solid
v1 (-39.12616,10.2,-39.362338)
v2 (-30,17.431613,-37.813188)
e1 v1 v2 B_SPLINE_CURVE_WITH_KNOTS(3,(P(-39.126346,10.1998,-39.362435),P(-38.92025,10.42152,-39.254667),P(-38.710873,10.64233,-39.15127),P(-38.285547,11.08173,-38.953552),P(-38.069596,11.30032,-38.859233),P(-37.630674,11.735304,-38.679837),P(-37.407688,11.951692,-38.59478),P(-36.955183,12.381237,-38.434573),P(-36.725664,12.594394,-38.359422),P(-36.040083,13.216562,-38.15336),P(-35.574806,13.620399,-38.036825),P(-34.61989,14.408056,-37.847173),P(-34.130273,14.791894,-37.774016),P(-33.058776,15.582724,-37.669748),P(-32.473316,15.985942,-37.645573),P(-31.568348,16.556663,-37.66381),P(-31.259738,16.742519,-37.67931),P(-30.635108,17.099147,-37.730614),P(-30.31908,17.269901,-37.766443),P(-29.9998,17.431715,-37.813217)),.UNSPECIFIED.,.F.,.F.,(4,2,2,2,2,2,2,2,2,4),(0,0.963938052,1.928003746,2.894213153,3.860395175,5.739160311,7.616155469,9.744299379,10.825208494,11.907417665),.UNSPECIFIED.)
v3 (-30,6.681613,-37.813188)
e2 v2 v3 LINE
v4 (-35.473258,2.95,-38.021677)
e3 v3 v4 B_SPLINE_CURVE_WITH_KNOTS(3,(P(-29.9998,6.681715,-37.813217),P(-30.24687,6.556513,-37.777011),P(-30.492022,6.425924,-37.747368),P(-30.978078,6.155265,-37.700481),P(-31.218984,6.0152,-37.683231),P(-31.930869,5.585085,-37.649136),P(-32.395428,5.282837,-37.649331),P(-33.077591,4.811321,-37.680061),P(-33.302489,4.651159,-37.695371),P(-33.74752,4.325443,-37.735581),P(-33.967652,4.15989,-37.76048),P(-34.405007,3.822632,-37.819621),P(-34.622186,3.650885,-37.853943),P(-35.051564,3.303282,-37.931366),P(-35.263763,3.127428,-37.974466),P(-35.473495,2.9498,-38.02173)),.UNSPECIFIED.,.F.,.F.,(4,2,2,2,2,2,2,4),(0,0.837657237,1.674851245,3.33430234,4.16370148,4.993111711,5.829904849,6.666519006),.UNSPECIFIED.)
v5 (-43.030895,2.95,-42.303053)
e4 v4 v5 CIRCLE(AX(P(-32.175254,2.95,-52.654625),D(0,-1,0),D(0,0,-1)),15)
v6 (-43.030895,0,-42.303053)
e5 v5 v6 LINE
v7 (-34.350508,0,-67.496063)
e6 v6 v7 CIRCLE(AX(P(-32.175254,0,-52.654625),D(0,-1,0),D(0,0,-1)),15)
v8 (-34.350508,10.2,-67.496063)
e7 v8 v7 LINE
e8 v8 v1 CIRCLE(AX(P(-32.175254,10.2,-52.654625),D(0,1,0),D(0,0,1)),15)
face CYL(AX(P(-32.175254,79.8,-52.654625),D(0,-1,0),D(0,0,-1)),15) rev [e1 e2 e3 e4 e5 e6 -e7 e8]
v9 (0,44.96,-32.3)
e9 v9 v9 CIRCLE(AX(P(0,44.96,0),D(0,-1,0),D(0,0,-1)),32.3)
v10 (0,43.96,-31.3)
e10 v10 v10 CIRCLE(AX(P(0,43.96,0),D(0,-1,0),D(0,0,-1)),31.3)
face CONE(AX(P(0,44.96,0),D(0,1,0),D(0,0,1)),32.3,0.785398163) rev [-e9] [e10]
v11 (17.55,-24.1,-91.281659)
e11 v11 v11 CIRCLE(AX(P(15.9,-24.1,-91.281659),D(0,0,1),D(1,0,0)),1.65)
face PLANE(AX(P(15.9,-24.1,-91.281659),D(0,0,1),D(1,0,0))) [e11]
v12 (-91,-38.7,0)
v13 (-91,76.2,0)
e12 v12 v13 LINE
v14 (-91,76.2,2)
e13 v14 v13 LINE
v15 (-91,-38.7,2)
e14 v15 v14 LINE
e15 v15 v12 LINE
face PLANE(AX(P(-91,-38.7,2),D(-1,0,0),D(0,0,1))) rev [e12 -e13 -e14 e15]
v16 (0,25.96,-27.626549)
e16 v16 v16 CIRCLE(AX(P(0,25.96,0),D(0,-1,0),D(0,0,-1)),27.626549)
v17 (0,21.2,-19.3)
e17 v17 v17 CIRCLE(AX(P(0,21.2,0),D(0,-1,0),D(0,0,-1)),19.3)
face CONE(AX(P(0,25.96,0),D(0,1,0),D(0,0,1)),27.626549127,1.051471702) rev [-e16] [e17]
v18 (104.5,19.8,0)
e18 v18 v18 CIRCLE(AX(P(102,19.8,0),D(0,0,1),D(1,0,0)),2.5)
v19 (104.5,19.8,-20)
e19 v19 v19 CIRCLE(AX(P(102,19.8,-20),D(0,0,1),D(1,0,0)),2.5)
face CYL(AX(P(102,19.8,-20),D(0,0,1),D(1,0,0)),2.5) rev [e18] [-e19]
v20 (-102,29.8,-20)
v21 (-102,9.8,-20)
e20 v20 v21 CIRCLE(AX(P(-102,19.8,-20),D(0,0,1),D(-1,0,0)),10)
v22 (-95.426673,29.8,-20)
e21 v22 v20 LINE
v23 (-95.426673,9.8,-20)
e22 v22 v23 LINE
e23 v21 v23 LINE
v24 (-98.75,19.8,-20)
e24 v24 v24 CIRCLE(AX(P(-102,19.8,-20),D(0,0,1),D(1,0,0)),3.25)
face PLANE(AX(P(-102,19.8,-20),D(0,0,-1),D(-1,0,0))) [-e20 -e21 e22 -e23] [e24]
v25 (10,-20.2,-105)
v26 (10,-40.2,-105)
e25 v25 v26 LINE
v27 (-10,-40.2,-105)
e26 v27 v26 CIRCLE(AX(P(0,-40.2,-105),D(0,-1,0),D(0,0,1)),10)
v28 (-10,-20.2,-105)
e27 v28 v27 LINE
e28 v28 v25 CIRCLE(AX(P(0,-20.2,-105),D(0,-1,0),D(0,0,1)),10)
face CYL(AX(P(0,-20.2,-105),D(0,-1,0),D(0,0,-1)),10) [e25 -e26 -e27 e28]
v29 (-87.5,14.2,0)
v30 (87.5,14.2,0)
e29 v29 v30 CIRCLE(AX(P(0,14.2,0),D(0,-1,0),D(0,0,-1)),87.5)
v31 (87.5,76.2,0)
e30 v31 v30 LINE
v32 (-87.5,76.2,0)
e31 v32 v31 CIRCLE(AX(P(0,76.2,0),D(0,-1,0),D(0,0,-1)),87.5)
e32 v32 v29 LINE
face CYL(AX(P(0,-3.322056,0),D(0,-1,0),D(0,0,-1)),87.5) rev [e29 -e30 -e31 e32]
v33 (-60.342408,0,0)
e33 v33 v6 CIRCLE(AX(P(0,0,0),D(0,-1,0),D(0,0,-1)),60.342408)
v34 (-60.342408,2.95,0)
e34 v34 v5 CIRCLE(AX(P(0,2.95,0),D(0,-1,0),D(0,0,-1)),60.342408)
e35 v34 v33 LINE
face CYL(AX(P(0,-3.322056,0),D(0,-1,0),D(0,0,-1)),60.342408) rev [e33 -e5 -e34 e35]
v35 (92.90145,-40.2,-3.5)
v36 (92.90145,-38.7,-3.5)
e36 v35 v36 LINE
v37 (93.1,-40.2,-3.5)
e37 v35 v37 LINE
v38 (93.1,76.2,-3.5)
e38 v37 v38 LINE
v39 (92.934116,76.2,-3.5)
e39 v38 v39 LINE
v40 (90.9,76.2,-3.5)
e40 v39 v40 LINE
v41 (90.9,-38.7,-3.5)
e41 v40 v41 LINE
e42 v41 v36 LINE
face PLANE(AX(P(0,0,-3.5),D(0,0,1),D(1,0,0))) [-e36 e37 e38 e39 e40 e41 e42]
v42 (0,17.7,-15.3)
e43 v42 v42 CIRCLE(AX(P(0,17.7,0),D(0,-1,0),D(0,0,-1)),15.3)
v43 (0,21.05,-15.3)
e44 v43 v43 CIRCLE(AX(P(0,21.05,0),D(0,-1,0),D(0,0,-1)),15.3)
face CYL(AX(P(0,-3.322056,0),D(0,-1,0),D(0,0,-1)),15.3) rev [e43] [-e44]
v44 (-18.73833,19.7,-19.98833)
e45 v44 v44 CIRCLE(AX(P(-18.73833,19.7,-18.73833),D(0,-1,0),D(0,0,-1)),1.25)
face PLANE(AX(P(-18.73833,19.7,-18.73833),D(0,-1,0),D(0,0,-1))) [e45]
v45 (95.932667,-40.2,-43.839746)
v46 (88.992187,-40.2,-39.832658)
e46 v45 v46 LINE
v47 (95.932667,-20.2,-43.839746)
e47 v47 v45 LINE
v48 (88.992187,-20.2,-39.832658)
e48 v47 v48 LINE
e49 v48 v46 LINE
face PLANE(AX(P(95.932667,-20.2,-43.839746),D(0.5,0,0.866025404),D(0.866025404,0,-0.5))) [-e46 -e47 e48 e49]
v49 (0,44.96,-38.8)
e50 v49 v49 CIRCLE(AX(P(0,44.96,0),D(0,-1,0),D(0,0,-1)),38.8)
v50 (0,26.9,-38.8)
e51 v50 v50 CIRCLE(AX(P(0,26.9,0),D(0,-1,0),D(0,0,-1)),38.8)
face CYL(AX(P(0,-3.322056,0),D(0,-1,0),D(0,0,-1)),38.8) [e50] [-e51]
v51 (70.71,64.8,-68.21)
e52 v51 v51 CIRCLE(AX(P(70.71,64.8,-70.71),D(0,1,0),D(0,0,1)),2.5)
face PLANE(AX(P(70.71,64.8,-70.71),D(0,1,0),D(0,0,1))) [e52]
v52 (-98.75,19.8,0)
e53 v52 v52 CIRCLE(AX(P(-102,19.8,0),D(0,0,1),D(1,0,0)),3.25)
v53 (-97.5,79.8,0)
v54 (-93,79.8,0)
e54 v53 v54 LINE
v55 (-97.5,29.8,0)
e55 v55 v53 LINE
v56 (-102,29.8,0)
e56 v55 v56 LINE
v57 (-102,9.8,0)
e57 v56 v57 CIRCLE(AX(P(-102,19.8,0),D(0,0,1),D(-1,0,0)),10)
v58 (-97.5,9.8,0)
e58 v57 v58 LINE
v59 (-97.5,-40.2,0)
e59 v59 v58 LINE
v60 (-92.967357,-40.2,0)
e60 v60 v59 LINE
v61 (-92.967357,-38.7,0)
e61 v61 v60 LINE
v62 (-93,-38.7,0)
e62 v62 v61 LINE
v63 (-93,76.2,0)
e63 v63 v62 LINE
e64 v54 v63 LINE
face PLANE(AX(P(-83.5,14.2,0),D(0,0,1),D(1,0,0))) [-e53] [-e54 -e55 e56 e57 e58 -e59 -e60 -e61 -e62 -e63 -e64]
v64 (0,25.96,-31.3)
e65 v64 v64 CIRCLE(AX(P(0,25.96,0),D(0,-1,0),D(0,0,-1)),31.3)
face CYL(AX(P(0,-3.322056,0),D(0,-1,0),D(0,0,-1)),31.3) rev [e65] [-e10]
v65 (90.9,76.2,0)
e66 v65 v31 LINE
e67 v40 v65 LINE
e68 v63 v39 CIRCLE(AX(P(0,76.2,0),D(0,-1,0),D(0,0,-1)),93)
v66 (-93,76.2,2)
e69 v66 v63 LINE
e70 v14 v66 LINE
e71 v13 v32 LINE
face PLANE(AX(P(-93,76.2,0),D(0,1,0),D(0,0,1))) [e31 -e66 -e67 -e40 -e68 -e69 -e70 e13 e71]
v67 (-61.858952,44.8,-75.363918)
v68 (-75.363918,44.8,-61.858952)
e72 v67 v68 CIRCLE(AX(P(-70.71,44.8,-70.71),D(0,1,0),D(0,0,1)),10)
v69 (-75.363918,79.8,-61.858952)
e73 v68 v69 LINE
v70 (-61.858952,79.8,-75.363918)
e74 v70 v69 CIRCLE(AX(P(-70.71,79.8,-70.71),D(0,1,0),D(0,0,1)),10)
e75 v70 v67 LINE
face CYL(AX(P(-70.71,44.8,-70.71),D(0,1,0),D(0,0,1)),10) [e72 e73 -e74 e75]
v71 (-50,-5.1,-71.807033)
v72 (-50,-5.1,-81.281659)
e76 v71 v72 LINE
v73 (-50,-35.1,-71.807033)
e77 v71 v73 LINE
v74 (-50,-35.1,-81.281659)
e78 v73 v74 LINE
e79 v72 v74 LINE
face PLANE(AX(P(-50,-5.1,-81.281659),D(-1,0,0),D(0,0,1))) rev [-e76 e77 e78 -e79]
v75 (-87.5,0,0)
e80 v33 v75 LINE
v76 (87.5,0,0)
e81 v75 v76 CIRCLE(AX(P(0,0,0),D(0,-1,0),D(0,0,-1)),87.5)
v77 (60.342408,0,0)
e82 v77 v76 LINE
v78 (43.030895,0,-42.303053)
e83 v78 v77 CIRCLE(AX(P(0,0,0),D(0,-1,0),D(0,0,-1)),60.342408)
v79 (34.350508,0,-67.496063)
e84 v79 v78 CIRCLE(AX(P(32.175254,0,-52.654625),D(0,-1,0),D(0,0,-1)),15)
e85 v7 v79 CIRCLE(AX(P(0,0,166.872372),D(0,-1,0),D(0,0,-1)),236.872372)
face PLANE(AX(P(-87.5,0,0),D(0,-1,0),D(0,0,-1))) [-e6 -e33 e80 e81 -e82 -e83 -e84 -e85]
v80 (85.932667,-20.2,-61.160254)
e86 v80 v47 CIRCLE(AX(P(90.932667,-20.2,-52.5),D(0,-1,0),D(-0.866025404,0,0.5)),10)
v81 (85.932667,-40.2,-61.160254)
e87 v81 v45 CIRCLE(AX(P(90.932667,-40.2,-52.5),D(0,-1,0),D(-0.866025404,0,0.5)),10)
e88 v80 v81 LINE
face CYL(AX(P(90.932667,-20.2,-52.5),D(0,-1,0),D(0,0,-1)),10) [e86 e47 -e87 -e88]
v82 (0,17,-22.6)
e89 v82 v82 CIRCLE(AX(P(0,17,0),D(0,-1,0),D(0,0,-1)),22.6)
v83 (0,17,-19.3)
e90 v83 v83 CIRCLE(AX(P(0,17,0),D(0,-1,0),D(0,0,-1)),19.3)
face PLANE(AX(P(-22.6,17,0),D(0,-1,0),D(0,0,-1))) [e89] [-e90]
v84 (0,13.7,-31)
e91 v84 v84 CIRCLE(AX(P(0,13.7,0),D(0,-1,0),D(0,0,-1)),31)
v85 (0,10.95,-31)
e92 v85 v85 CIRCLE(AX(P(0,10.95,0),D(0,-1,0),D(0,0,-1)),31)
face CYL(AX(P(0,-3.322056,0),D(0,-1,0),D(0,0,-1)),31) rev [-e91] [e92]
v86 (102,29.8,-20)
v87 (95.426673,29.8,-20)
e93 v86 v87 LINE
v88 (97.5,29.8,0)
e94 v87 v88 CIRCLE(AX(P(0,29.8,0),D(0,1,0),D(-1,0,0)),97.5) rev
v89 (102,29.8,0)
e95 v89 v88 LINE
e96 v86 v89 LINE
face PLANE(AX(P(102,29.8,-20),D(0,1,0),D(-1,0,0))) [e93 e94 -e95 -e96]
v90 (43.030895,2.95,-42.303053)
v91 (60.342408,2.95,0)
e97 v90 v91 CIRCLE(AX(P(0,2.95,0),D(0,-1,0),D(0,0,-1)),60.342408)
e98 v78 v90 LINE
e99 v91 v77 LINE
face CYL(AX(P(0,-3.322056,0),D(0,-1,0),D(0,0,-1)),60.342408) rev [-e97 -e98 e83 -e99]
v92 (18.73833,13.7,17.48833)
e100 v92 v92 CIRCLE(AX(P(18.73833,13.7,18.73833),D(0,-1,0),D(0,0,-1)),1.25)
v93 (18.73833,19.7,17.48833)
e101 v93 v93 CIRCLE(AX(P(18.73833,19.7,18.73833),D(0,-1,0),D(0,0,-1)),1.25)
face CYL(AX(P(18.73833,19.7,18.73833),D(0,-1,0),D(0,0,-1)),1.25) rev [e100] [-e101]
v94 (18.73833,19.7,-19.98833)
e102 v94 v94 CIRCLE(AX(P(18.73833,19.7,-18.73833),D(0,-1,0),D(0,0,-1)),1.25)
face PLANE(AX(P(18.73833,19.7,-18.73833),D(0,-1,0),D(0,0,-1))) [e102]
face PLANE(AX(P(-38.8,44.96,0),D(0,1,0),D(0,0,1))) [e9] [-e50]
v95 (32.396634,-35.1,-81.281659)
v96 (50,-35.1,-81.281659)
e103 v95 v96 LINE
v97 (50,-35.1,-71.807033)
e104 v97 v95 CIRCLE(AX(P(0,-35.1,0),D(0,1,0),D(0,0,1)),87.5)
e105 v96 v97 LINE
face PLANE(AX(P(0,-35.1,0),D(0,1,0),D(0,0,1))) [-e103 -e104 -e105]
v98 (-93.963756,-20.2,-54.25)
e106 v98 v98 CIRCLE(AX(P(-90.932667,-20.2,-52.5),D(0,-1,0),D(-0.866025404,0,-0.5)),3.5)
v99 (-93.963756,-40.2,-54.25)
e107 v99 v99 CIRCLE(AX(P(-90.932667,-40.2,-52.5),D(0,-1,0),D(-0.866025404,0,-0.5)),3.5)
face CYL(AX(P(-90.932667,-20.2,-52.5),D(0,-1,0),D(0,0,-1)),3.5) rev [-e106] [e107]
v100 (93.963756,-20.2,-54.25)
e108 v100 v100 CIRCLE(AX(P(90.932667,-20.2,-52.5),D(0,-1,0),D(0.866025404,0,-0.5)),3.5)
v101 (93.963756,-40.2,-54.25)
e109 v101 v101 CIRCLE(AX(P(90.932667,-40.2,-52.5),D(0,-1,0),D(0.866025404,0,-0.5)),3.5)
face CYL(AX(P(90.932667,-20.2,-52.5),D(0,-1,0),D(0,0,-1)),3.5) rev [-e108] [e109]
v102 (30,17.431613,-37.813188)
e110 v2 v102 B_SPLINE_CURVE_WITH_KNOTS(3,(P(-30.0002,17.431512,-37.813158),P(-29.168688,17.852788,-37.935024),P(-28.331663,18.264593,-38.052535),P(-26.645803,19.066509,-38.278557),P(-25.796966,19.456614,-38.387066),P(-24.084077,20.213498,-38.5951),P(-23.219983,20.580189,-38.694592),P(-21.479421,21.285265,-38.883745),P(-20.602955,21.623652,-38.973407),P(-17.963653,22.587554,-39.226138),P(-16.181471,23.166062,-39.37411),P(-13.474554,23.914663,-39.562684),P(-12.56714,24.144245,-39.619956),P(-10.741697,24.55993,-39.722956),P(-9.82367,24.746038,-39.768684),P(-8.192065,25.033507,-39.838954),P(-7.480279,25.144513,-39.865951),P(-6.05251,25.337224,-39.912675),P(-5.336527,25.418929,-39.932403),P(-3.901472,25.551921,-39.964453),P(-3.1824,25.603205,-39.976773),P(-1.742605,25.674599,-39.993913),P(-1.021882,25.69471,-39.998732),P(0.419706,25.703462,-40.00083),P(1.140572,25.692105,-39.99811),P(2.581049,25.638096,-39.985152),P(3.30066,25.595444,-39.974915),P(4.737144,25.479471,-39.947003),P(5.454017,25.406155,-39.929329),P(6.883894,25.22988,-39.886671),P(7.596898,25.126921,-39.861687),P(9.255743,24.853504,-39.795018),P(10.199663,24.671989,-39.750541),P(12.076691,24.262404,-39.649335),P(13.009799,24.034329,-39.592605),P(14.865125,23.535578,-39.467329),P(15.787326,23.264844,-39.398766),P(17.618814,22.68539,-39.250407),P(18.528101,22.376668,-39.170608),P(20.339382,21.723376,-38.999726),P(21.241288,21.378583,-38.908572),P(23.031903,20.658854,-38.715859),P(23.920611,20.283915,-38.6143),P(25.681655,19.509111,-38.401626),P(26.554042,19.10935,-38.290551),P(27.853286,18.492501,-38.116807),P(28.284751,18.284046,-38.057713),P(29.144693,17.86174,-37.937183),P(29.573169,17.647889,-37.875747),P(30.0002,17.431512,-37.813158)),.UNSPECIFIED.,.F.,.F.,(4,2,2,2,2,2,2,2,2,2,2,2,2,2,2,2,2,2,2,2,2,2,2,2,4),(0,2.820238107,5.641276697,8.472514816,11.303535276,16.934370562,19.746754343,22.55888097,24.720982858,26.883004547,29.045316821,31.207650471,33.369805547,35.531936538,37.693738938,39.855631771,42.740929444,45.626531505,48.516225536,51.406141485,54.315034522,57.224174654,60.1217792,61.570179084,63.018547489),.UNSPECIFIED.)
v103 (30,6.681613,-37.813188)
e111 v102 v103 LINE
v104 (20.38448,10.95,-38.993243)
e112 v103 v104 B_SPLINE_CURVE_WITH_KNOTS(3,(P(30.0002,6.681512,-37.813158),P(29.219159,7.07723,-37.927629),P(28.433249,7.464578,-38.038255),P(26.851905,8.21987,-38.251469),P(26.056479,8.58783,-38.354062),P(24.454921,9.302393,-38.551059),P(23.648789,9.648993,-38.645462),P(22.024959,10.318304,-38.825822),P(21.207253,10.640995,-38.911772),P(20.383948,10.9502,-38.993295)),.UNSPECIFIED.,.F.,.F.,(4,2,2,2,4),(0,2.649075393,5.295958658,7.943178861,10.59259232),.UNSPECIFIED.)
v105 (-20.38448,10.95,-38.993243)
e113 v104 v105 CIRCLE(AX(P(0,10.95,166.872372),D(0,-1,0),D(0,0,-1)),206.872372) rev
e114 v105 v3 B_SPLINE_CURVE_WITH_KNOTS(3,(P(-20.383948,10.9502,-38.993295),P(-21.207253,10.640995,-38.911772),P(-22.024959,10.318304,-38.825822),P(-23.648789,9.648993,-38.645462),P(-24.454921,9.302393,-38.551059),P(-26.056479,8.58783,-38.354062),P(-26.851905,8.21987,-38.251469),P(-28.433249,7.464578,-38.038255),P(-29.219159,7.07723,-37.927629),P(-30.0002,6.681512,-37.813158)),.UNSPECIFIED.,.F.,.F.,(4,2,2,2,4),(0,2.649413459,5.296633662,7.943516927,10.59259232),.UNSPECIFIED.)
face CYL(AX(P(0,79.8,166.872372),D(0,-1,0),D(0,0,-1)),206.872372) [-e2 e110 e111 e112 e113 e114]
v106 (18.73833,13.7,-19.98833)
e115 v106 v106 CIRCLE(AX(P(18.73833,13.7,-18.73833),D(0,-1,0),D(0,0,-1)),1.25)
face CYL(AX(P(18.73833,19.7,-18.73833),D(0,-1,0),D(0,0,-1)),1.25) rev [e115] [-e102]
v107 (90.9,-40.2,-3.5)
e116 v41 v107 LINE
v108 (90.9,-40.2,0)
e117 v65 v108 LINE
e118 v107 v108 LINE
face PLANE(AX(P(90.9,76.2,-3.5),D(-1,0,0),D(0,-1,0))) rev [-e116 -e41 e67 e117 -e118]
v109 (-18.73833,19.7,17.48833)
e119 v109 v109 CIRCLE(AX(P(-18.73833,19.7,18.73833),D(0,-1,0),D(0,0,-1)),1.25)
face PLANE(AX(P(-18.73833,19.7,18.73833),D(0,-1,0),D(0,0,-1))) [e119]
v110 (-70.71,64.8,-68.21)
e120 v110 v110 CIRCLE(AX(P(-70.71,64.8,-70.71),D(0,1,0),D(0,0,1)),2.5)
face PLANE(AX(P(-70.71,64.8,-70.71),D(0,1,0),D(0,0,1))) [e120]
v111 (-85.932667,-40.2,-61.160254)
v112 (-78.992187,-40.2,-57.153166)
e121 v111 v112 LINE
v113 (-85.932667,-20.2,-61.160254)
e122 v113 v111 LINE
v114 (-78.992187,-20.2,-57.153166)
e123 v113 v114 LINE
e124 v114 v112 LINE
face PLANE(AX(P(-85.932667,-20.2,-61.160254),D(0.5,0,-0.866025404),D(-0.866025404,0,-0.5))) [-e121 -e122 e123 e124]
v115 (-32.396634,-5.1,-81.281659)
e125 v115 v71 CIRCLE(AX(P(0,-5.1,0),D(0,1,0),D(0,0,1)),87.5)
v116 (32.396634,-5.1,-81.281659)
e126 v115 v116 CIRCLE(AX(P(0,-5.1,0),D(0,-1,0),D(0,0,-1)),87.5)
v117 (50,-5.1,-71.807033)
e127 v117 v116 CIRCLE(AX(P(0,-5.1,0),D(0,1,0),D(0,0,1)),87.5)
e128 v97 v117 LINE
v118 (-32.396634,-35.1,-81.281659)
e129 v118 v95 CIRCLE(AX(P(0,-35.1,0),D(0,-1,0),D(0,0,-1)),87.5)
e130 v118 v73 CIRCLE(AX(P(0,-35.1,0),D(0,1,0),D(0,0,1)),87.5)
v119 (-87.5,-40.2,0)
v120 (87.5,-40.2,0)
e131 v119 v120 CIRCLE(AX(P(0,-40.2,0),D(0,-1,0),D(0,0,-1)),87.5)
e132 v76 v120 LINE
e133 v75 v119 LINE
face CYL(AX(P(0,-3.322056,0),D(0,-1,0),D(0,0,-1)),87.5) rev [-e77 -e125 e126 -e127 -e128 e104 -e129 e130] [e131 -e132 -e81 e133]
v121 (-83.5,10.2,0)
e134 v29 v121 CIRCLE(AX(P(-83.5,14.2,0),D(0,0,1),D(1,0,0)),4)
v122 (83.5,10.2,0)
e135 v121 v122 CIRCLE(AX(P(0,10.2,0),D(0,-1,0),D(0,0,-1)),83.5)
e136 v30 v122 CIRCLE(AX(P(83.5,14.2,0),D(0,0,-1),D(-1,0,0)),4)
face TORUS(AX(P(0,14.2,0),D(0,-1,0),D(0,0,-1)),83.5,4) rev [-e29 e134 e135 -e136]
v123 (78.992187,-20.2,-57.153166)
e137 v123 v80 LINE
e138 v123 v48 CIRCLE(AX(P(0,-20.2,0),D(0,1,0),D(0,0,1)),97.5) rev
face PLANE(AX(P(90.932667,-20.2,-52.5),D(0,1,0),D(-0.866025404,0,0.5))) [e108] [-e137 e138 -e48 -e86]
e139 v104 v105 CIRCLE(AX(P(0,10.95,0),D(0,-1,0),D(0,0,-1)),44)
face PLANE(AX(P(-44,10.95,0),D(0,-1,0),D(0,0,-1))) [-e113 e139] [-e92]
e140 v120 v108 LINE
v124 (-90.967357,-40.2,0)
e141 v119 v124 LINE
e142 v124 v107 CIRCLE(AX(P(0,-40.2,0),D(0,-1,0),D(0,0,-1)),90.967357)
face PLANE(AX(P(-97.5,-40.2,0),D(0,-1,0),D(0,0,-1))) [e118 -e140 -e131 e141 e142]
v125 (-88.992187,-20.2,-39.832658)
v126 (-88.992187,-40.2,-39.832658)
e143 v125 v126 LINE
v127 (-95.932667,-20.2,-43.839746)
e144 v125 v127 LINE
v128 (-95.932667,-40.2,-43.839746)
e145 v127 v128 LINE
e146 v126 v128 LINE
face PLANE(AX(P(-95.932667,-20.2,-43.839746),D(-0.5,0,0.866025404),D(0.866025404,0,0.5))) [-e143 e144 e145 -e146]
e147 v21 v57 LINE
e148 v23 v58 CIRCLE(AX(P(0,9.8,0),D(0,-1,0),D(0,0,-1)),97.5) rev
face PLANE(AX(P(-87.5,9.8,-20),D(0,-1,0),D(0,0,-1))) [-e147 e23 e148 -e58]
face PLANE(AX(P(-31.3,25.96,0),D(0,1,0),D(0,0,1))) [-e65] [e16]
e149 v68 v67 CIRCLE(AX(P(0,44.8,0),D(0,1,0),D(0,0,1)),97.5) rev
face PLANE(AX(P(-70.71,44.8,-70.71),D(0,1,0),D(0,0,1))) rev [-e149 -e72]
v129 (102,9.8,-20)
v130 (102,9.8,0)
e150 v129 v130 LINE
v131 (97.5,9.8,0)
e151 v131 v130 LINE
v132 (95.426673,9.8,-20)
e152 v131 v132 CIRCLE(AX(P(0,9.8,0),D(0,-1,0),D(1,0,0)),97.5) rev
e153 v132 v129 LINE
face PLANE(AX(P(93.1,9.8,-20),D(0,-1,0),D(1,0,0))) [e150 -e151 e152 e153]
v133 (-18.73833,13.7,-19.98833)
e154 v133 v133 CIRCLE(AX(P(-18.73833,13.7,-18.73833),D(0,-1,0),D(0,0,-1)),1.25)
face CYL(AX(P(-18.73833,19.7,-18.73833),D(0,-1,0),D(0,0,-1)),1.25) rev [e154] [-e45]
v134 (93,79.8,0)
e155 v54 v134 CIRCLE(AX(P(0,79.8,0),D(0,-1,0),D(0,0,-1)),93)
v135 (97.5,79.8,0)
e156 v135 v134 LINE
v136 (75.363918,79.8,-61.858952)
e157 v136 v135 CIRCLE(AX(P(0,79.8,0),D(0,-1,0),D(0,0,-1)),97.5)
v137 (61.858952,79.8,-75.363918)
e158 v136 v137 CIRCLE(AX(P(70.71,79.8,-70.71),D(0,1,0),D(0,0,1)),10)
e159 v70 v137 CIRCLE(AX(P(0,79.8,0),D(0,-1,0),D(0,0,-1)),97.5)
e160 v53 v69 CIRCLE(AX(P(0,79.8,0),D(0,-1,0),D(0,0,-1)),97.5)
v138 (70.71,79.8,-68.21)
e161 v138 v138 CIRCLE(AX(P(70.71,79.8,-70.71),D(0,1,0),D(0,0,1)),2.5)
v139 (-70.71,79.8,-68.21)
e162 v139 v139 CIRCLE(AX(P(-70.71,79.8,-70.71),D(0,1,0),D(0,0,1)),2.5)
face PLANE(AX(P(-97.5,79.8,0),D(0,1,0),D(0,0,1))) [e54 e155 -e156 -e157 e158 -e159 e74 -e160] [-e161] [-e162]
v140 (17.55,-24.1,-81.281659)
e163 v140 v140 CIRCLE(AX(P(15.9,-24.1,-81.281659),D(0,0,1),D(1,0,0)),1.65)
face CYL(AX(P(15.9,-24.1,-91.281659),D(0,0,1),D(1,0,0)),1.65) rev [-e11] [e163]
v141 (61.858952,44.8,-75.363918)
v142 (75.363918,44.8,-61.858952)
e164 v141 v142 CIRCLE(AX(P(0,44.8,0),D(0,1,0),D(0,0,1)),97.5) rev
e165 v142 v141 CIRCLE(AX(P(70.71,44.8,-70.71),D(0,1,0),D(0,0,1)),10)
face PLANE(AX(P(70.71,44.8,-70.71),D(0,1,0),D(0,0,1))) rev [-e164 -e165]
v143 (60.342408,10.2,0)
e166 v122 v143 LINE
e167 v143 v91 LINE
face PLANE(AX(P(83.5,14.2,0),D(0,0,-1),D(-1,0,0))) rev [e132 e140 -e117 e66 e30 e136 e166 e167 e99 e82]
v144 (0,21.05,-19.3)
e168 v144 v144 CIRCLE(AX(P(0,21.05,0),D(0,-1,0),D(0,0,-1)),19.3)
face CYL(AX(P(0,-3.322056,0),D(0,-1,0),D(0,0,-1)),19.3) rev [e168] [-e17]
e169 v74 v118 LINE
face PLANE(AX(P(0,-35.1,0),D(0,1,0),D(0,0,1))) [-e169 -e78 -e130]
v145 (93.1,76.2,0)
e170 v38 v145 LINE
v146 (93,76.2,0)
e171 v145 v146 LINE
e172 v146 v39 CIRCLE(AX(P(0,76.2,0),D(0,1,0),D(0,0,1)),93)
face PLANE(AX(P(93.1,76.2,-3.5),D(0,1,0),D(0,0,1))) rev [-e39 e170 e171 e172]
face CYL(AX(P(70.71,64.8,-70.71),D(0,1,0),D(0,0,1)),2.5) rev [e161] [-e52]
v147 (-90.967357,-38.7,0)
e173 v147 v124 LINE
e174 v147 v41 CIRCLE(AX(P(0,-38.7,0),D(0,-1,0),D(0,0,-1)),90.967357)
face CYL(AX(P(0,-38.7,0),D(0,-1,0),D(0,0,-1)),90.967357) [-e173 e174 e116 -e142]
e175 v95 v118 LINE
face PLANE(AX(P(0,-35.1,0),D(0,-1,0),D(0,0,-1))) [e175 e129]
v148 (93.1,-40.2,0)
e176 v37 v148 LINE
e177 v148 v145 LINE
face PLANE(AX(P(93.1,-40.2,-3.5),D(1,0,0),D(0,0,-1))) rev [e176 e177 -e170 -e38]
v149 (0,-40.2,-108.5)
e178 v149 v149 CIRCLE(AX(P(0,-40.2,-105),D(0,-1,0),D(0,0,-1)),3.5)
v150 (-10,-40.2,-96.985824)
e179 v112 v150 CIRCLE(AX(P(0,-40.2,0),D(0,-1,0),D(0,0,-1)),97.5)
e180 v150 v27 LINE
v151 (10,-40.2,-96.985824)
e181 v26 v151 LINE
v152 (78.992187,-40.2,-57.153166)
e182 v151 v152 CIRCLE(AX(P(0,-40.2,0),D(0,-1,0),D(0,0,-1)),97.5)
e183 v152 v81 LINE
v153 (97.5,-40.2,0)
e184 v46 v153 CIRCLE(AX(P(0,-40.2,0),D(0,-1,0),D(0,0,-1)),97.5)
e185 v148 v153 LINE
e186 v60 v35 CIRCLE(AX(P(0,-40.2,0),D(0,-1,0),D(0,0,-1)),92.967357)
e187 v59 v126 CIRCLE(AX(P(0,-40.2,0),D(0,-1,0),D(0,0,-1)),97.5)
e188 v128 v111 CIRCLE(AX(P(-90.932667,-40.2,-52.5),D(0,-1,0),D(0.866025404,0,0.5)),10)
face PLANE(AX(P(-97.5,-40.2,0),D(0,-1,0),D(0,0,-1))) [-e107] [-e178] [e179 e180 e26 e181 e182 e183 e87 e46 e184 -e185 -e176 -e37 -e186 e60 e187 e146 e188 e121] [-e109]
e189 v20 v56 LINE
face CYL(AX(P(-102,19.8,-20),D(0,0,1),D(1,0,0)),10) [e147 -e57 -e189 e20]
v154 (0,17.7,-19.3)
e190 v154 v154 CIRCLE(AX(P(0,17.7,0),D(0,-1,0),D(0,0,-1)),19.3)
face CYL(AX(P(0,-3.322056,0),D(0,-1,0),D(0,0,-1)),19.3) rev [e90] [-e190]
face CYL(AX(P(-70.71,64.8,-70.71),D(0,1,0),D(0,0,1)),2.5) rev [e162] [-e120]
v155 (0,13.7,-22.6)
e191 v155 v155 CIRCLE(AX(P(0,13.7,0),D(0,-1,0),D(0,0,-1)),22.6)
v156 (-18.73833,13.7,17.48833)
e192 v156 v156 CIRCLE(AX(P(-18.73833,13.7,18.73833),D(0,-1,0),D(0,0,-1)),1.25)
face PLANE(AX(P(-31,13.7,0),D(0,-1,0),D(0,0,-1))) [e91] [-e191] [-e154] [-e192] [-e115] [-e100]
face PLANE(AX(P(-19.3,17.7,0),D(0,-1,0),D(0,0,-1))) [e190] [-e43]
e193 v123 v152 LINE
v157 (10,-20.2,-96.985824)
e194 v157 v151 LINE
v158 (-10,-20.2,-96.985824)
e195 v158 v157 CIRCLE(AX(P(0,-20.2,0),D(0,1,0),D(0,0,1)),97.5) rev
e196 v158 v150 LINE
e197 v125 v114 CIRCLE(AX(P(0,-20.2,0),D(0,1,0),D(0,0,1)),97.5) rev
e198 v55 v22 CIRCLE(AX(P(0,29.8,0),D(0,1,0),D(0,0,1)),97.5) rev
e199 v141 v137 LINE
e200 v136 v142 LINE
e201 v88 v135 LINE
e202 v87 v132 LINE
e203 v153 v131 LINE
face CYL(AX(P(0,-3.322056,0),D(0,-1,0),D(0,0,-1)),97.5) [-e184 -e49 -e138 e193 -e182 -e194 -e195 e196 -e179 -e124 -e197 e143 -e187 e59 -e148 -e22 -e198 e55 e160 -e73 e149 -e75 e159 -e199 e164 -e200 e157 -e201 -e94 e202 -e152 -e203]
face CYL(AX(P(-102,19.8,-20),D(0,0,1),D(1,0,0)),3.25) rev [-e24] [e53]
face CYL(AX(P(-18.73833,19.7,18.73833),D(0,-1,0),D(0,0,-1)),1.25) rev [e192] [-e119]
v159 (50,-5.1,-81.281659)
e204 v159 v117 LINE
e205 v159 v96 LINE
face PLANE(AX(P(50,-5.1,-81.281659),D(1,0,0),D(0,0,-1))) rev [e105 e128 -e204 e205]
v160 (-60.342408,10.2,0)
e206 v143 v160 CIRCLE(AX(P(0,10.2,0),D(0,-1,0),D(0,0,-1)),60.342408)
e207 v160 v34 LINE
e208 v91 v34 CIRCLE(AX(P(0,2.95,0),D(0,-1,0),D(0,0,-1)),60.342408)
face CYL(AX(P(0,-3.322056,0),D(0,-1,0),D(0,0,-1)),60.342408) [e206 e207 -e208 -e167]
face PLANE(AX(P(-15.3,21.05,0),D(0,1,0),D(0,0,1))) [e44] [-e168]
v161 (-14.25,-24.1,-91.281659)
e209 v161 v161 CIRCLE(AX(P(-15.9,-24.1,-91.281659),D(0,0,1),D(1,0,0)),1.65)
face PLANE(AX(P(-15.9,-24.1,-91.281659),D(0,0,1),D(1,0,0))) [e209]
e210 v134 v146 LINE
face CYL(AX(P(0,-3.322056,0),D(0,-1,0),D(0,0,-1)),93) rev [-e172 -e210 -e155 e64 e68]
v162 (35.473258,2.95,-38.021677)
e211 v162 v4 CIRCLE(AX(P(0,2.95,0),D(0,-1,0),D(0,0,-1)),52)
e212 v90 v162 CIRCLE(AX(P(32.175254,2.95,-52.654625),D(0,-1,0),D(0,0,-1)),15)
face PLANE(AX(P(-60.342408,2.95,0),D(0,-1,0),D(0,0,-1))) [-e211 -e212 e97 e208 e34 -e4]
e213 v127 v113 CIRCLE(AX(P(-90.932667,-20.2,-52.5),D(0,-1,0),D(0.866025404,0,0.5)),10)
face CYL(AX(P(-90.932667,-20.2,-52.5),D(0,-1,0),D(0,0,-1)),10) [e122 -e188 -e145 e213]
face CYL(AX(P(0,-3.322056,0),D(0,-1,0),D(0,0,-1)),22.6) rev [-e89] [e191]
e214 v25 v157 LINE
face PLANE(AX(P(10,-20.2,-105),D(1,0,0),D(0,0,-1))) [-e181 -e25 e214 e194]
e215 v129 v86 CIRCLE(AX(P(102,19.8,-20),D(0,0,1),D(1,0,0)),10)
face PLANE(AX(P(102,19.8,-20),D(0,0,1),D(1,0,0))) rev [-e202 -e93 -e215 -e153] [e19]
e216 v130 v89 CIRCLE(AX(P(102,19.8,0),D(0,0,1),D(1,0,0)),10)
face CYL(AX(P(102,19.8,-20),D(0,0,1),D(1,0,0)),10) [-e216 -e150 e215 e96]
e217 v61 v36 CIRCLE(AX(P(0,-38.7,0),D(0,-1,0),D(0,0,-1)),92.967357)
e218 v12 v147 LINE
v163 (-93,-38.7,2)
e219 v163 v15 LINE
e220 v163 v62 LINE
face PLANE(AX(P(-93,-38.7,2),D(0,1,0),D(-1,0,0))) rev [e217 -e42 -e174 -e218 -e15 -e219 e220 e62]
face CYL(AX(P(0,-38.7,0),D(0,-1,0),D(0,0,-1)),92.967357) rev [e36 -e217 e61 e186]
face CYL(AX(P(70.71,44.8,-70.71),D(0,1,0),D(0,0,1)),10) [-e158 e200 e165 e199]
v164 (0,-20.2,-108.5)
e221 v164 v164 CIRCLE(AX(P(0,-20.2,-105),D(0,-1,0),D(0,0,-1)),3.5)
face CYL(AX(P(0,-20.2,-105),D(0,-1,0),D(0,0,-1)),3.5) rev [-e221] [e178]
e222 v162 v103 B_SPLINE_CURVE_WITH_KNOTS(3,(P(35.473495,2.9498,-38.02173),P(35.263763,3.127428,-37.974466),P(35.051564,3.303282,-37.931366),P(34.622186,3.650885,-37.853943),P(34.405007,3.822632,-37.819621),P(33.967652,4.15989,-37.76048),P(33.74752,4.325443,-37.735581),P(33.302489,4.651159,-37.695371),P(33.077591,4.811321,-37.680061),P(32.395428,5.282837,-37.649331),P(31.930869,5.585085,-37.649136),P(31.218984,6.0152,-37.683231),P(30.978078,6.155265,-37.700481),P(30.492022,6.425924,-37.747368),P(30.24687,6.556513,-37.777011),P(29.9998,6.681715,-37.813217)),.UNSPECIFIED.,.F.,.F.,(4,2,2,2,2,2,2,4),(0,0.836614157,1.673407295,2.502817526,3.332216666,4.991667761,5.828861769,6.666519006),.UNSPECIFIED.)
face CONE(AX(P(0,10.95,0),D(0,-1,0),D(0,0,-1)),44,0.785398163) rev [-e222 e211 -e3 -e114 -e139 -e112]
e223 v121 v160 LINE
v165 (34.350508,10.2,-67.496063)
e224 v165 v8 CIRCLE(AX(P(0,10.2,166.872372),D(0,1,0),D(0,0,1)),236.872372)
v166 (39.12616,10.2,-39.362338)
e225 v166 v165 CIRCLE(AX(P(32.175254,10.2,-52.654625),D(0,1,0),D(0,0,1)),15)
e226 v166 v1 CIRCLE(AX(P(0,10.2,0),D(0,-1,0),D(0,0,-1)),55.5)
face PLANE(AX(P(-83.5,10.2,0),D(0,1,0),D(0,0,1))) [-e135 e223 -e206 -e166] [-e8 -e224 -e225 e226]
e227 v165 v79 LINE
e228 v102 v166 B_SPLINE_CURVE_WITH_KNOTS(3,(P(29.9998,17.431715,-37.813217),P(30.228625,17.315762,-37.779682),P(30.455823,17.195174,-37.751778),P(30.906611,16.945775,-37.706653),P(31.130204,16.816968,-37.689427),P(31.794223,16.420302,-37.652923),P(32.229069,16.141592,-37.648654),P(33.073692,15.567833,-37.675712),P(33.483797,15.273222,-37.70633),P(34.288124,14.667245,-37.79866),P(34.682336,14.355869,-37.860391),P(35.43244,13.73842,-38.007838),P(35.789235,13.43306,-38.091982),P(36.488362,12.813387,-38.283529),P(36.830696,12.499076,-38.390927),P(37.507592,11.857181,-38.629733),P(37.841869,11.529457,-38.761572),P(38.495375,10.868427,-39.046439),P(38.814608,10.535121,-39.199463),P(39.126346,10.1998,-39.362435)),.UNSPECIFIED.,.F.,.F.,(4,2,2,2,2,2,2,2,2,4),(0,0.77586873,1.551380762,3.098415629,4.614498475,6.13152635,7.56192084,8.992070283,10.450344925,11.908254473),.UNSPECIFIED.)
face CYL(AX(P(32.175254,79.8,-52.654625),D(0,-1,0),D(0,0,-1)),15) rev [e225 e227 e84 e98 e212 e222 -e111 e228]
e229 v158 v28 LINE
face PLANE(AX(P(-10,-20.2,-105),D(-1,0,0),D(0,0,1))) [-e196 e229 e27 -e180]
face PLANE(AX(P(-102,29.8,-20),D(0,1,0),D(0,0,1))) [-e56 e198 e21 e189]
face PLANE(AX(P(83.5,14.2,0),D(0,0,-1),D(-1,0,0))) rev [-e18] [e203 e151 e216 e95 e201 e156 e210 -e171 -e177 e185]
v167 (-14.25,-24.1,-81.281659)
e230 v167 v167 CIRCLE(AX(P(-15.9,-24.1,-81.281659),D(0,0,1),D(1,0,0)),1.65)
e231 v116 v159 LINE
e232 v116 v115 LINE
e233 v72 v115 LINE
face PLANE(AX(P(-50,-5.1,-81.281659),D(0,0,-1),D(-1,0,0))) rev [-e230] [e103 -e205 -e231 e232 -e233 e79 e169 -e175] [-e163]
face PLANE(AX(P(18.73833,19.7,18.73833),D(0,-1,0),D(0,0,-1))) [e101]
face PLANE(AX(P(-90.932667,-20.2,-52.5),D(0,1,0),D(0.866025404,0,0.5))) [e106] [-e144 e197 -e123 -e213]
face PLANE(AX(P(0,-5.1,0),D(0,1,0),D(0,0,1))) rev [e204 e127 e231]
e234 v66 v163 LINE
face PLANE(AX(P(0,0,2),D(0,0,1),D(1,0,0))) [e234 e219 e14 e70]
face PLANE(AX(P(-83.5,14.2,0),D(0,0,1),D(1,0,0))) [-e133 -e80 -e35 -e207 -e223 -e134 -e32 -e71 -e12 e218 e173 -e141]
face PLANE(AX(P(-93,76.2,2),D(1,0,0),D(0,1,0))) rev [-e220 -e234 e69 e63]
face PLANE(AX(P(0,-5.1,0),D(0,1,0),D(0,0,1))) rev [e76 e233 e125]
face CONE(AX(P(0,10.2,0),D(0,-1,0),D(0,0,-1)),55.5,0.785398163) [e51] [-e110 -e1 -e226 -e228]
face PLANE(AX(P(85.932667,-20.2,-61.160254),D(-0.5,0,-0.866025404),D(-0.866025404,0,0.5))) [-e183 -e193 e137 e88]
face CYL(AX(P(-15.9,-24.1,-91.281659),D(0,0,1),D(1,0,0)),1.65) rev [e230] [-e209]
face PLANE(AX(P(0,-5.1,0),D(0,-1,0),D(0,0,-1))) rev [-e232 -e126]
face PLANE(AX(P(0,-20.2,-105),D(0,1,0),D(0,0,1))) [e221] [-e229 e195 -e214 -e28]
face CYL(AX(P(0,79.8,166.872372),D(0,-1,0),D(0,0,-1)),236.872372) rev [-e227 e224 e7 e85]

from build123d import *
from build123d.topology import SkipClean

# Parameters (mm, degrees)
REVOLU_O2_ANGLE          = 180
ESBO_O4_R                = 10
RESSALTO_EXTRUS_O1_DEPTH = 35
RESSALTO_EXTRUS_O2_DEPTH = 20
ESBO_O8_R                = 3.5
CORTE_EXTRUS_O2_DEPTH    = 20
PADR_OCIRCULAR1_COUNT    = 6
ESBO_O6_R                = 2.5
CORTE_EXTRUS_O1_DEPTH    = 15
ESBO_O9_R                = 1.25
CORTE_EXTRUS_O3_DEPTH    = 6
ESBO_O10_W               = 2.2
ESBO_O10_H               = 116.4
CORTE_EXTRUS_O4_DEPTH    = 3.5
ESBO_O11_W               = 2
ESBO_O11_H               = 114.9
RESSALTO_EXTRUS_O5_DEPTH = 2
ESBO_O12_R               = 3.25
RESSALTO_EXTRUS_O6_DEPTH = 20
ESBO_O13_R               = 2.5
RESSALTO_EXTRUS_O7_DEPTH = 20
CORTE_EXTRUS_O5_DEPTH    = 180.26806743
CORTE_EXTRUS_O6_START    = 10
ESBO_O16_R               = 93
CORTE_EXTRUS_O6_DEPTH    = 10
ESBO_O17_R               = 92.967356783
ESBO_O17_R_2             = 90.967356783
CORTE_EXTRUS_O7_DEPTH    = 1.5
ESBO_O18_W               = 100
ESBO_O18_H               = 17.238697901
CORTE_EXTRUS_O8_DEPTH    = 15
RESSALTO_EXTRUS_O9_DEPTH = 15
ESBO_O22_R               = 1.65
CORTE_EXTRUS_O9_DEPTH    = 10


with BuildPart() as part:
    # Esboço3 → Revolução2 (revolve)
    with BuildSketch(Plane.XY):
        with BuildLine():
            Line((97.5, 79.8), (97.5, 11.304491341))
            Line((97.5, 11.304491341), (97.5, 0))
            Line((97.5, 0), (97.5, -40.2))
            Line((97.5, -40.2), (87.5, -40.2))
            Line((87.5, -40.2), (87.5, 0))
            Line((87.5, 0), (60.342408243, 0))
            Line((60.342408243, 0), (60.342408243, 2.95))
            Line((60.342408243, 2.95), (52, 2.95))
            Line((52, 2.95), (44, 10.95))
            Line((44, 10.95), (31, 10.95))
            Line((31, 10.95), (31, 13.7))
            Line((31, 13.7), (22.6, 13.7))
            Line((22.6, 13.7), (22.6, 17))
            Line((22.6, 17), (19.3, 17))
            Line((19.3, 17), (19.3, 17.7))
            Line((19.3, 17.7), (15.3, 17.7))
            Line((15.3, 17.7), (15.3, 21.05))
            Line((15.3, 21.05), (19.3, 21.05))
            Line((19.3, 21.05), (19.3, 21.2))
            Line((19.3, 21.2), (27.626549127, 25.96))
            Line((27.626549127, 25.96), (31.3, 25.96))
            Line((31.3, 25.96), (31.3, 43.96))
            Line((31.3, 43.96), (32.3, 44.96))
            Line((32.3, 44.96), (38.8, 44.96))
            Line((38.8, 44.96), (38.8, 26.9))
            Line((38.8, 26.9), (55.5, 10.2))
            Line((55.5, 10.2), (83.5, 10.2))
            ThreePointArc((83.5, 10.2), (86.328427125, 11.371572875), (87.5, 14.2))
            Line((87.5, 14.2), (87.5, 76.2))
            Line((87.5, 76.2), (93, 76.2))
            Line((93, 76.2), (93, 79.8))
            Line((93, 79.8), (97.5, 79.8))
        make_face()
    revolve(axis=Axis((0, -3.322055656, 0), (0, 1, 0)), revolution_arc=REVOLU_O2_ANGLE)

    # Esboço20 → Revolução3 (revolve)
    with SkipClean():  # the faces are left unmerged after this step: merging them gives an invalid solid
        with BuildSketch(Plane.XY, mode=Mode.PRIVATE) as revolu_o3_sk:
            Polygon((60.342408243, 2.95), (60.342408243, 10.2), (55.5, 10.2), (38.8, 26.9), (38.8, 44.96), (32.3, 44.96), (31.3, 43.96), (31.3, 25.96), (27.626549127, 25.96), (19.3, 21.2), (19.3, 21.05), (15.3, 21.05), (15.3, 17.7), (19.3, 17.7), (19.3, 17), (22.6, 17), (22.6, 13.7), (31, 13.7), (31, 10.95), (44, 10.95), (52, 2.95), align=None)
        revolve(revolu_o3_sk.sketch.rotate(Axis((0, -3.322055656, 0), (0, 1, 0)), 90), axis=Axis((0, -3.322055656, 0), (0, 1, 0)))
    add(part.part.scale(1), mode=Mode.REPLACE)  # the faces are merged on a copy

    # Esboço4 → Ressalto-extrusão1 (add)
    with SkipClean():  # the faces are left unmerged after this step: merging them gives an invalid solid
        with BuildSketch(Plane(origin=(0, 79.8, 0), x_dir=(1, 0, 0), z_dir=(0, 1, 0))):
            with Locations((70.71, 70.71)):
                Circle(ESBO_O4_R)
            with Locations((-70.71, 70.71)):
                Circle(ESBO_O4_R)
        extrude(amount=-RESSALTO_EXTRUS_O1_DEPTH)

    # Esboço5 → Ressalto-extrusão2 (add)
    with SkipClean():  # the faces are left unmerged after this step: merging them gives an invalid solid
        with BuildSketch(Plane.XZ.offset(40.2)):
            with BuildLine():
                Line((10, -105), (10, -96.985823706))
                Line((10, -96.985823706), (-10, -96.985823706))
                Line((-10, -96.985823706), (-10, -105))
                ThreePointArc((-10, -105), (0, -115), (10, -105))
            make_face()
        ressalto_extrus_o2 = extrude(amount=-RESSALTO_EXTRUS_O2_DEPTH)

    # Esboço8 → Corte-extrusão2 (cut)
    with SkipClean():  # the faces are left unmerged after this step: merging them gives an invalid solid
        with BuildSketch(Plane.XZ.offset(40.2)):
            with Locations(Location((0, -105, 0), (0, 0, 270))):
                Circle(ESBO_O8_R)
        corte_extrus_o2 = extrude(amount=-CORTE_EXTRUS_O2_DEPTH, mode=Mode.SUBTRACT)

    # PadrãoCircular1: Ressalto-extrusão2, Corte-extrusão2 ×6 about axis, 3 skipped
    with SkipClean():  # the faces are left unmerged after this step: merging them gives an invalid solid
        padr_ocircular1_axis = Axis((0, 0, 0), (0, 1, 0))
        add([ressalto_extrus_o2.rotate(padr_ocircular1_axis, i * 360 / PADR_OCIRCULAR1_COUNT) for i in range(1, PADR_OCIRCULAR1_COUNT) if i not in (2, 3, 4)])
        add([corte_extrus_o2.rotate(padr_ocircular1_axis, i * 360 / PADR_OCIRCULAR1_COUNT) for i in range(1, PADR_OCIRCULAR1_COUNT) if i not in (2, 3, 4)], mode=Mode.SUBTRACT)

    # Esboço6 → Corte-extrusão1 (cut)
    with SkipClean():  # the faces are left unmerged after this step: merging them gives an invalid solid
        with BuildSketch(Plane(origin=(0, 79.8, 0), x_dir=(1, 0, 0), z_dir=(0, 1, 0))):
            with Locations(Location((70.71, 70.71, 0), (0, 0, 270))):
                Circle(ESBO_O6_R)
            with Locations(Location((-70.71, 70.71, 0), (0, 0, 270))):
                Circle(ESBO_O6_R)
        extrude(amount=-CORTE_EXTRUS_O1_DEPTH, mode=Mode.SUBTRACT)

    # Esboço9 → Corte-extrusão3 (cut)
    with SkipClean():  # the faces are left unmerged after this step: merging them gives an invalid solid
        with BuildSketch(Plane.XZ.offset(-13.7)):
            with Locations(Location((18.738329701, -18.738329701, 0), (0, 0, 270))):
                Circle(ESBO_O9_R)
            with Locations(Location((-18.738329701, -18.738329701, 0), (0, 0, 270))):
                Circle(ESBO_O9_R)
            with Locations(Location((-18.738329701, 18.738329701, 0), (0, 0, 270))):
                Circle(ESBO_O9_R)
            with Locations(Location((18.738329701, 18.738329701, 0), (0, 0, 270))):
                Circle(ESBO_O9_R)
        extrude(amount=-CORTE_EXTRUS_O3_DEPTH, mode=Mode.SUBTRACT)

    # Esboço10 → Corte-extrusão4 (cut)
    with SkipClean():  # the faces are left unmerged after this step: merging them gives an invalid solid
        with BuildSketch(Plane.XY):
            with Locations((92, 18)):
                Rectangle(ESBO_O10_W, ESBO_O10_H)
        extrude(amount=-CORTE_EXTRUS_O4_DEPTH, mode=Mode.SUBTRACT)

    # Esboço11 → Ressalto-extrusão5 (add)
    with SkipClean():  # the faces are left unmerged after this step: merging them gives an invalid solid
        with BuildSketch(Plane.XY):
            with Locations((-92, 18.75)):
                Rectangle(ESBO_O11_W, ESBO_O11_H)
        extrude(amount=RESSALTO_EXTRUS_O5_DEPTH)

    # Esboço12 → Ressalto-extrusão6 (add)
    with BuildSketch(Plane.XY):
        with BuildLine():
            Line((-102, 29.8), (-87.5, 29.8))
            Line((-87.5, 29.8), (-87.5, 9.8))
            Line((-87.5, 9.8), (-102, 9.8))
            ThreePointArc((-102, 9.8), (-112, 19.8), (-102, 29.8))
        make_face()
        with Locations((-102, 19.8)):
            Circle(ESBO_O12_R, mode=Mode.SUBTRACT)
    extrude(amount=-RESSALTO_EXTRUS_O6_DEPTH)

    # Esboço13 → Ressalto-extrusão7 (add)
    with BuildSketch(Plane.XY):
        with BuildLine():
            Line((102, 29.8), (93.1, 29.8))
            Line((93.1, 29.8), (93.1, 9.8))
            Line((93.1, 9.8), (102, 9.8))
            ThreePointArc((102, 9.8), (112, 19.8), (102, 29.8))
        make_face()
        with Locations((102, 19.8)):
            Circle(ESBO_O13_R, mode=Mode.SUBTRACT)
    extrude(amount=-RESSALTO_EXTRUS_O7_DEPTH)

    # Esboço14 → Corte-extrusão5 (cut, through all)
    with SkipClean():  # the faces are left unmerged after this step: merging them gives an invalid solid
        with BuildSketch(Plane(origin=(0, 0, 0), x_dir=(-1, 0, 0), z_dir=(0, -1, 0))):
            with BuildLine():
                ThreePointArc((34.350508428, 67.496062714), (0, 70), (-34.350508428, 67.496062714))
                ThreePointArc((-34.350508428, 67.496062714), (-47.016691783, 50.479370931), (-30, 37.813187576))
                ThreePointArc((-30, 37.813187576), (0, 40), (30, 37.813187576))
                ThreePointArc((30, 37.813187576), (47.016691783, 50.479370931), (34.350508428, 67.496062714))
            make_face()
        extrude(amount=-CORTE_EXTRUS_O5_DEPTH, mode=Mode.SUBTRACT)

    # Esboço16 → Corte-extrusão6 (cut)
    with SkipClean():  # the faces are left unmerged after this step: merging them gives an invalid solid
        with BuildSketch(Plane(origin=(0, 76.2, 0), x_dir=(1, 0, 0), z_dir=(0, 1, 0)).offset(CORTE_EXTRUS_O6_START)):
            Circle(ESBO_O16_R)
        extrude(amount=-CORTE_EXTRUS_O6_DEPTH, mode=Mode.SUBTRACT)

    # Esboço17 → Corte-extrusão7 (cut)
    with SkipClean():  # the faces are left unmerged after this step: merging them gives an invalid solid
        with BuildSketch(Plane.XZ.offset(40.2)):
            Circle(ESBO_O17_R)
            Circle(ESBO_O17_R_2, mode=Mode.SUBTRACT)
        extrude(amount=-CORTE_EXTRUS_O7_DEPTH, mode=Mode.SUBTRACT)

    # Esboço18 → Corte-extrusão8 (cut, symmetric)
    with SkipClean():  # the faces are left unmerged after this step: merging them gives an invalid solid
        with BuildSketch(Plane(origin=(0, -20.1, 0), x_dir=(-1, 0, 0), z_dir=(0, -1, 0))):
            with Locations((0, 72.662310295)):
                Rectangle(ESBO_O18_W, ESBO_O18_H)
        extrude(amount=CORTE_EXTRUS_O8_DEPTH, both=True, mode=Mode.SUBTRACT)

    # Esboço19 → Ressalto-extrusão9 (add, symmetric)
    with SkipClean():  # the faces are left unmerged after this step: merging them gives an invalid solid
        with BuildSketch(Plane(origin=(0, -20.1, 0), x_dir=(-1, 0, 0), z_dir=(0, -1, 0))):
            with BuildLine():
                Line((32.396633626, 81.281659245), (-32.396633626, 81.281659245))
                ThreePointArc((-32.396633626, 81.281659245), (0, 87.5), (32.396633626, 81.281659245))
            make_face()
        extrude(amount=RESSALTO_EXTRUS_O9_DEPTH, both=True)

    # Esboço22 → Corte-extrusão9 (cut)
    with SkipClean():  # the faces are left unmerged after this step: merging them gives an invalid solid
        with BuildSketch(Plane.XY.offset(-81.281659245)):
            with Locations((-15.9, -24.1)):
                Circle(ESBO_O22_R)
            with Locations((15.9, -24.1)):
                Circle(ESBO_O22_R)
        extrude(amount=-CORTE_EXTRUS_O9_DEPTH, mode=Mode.SUBTRACT)


solid = part.part
